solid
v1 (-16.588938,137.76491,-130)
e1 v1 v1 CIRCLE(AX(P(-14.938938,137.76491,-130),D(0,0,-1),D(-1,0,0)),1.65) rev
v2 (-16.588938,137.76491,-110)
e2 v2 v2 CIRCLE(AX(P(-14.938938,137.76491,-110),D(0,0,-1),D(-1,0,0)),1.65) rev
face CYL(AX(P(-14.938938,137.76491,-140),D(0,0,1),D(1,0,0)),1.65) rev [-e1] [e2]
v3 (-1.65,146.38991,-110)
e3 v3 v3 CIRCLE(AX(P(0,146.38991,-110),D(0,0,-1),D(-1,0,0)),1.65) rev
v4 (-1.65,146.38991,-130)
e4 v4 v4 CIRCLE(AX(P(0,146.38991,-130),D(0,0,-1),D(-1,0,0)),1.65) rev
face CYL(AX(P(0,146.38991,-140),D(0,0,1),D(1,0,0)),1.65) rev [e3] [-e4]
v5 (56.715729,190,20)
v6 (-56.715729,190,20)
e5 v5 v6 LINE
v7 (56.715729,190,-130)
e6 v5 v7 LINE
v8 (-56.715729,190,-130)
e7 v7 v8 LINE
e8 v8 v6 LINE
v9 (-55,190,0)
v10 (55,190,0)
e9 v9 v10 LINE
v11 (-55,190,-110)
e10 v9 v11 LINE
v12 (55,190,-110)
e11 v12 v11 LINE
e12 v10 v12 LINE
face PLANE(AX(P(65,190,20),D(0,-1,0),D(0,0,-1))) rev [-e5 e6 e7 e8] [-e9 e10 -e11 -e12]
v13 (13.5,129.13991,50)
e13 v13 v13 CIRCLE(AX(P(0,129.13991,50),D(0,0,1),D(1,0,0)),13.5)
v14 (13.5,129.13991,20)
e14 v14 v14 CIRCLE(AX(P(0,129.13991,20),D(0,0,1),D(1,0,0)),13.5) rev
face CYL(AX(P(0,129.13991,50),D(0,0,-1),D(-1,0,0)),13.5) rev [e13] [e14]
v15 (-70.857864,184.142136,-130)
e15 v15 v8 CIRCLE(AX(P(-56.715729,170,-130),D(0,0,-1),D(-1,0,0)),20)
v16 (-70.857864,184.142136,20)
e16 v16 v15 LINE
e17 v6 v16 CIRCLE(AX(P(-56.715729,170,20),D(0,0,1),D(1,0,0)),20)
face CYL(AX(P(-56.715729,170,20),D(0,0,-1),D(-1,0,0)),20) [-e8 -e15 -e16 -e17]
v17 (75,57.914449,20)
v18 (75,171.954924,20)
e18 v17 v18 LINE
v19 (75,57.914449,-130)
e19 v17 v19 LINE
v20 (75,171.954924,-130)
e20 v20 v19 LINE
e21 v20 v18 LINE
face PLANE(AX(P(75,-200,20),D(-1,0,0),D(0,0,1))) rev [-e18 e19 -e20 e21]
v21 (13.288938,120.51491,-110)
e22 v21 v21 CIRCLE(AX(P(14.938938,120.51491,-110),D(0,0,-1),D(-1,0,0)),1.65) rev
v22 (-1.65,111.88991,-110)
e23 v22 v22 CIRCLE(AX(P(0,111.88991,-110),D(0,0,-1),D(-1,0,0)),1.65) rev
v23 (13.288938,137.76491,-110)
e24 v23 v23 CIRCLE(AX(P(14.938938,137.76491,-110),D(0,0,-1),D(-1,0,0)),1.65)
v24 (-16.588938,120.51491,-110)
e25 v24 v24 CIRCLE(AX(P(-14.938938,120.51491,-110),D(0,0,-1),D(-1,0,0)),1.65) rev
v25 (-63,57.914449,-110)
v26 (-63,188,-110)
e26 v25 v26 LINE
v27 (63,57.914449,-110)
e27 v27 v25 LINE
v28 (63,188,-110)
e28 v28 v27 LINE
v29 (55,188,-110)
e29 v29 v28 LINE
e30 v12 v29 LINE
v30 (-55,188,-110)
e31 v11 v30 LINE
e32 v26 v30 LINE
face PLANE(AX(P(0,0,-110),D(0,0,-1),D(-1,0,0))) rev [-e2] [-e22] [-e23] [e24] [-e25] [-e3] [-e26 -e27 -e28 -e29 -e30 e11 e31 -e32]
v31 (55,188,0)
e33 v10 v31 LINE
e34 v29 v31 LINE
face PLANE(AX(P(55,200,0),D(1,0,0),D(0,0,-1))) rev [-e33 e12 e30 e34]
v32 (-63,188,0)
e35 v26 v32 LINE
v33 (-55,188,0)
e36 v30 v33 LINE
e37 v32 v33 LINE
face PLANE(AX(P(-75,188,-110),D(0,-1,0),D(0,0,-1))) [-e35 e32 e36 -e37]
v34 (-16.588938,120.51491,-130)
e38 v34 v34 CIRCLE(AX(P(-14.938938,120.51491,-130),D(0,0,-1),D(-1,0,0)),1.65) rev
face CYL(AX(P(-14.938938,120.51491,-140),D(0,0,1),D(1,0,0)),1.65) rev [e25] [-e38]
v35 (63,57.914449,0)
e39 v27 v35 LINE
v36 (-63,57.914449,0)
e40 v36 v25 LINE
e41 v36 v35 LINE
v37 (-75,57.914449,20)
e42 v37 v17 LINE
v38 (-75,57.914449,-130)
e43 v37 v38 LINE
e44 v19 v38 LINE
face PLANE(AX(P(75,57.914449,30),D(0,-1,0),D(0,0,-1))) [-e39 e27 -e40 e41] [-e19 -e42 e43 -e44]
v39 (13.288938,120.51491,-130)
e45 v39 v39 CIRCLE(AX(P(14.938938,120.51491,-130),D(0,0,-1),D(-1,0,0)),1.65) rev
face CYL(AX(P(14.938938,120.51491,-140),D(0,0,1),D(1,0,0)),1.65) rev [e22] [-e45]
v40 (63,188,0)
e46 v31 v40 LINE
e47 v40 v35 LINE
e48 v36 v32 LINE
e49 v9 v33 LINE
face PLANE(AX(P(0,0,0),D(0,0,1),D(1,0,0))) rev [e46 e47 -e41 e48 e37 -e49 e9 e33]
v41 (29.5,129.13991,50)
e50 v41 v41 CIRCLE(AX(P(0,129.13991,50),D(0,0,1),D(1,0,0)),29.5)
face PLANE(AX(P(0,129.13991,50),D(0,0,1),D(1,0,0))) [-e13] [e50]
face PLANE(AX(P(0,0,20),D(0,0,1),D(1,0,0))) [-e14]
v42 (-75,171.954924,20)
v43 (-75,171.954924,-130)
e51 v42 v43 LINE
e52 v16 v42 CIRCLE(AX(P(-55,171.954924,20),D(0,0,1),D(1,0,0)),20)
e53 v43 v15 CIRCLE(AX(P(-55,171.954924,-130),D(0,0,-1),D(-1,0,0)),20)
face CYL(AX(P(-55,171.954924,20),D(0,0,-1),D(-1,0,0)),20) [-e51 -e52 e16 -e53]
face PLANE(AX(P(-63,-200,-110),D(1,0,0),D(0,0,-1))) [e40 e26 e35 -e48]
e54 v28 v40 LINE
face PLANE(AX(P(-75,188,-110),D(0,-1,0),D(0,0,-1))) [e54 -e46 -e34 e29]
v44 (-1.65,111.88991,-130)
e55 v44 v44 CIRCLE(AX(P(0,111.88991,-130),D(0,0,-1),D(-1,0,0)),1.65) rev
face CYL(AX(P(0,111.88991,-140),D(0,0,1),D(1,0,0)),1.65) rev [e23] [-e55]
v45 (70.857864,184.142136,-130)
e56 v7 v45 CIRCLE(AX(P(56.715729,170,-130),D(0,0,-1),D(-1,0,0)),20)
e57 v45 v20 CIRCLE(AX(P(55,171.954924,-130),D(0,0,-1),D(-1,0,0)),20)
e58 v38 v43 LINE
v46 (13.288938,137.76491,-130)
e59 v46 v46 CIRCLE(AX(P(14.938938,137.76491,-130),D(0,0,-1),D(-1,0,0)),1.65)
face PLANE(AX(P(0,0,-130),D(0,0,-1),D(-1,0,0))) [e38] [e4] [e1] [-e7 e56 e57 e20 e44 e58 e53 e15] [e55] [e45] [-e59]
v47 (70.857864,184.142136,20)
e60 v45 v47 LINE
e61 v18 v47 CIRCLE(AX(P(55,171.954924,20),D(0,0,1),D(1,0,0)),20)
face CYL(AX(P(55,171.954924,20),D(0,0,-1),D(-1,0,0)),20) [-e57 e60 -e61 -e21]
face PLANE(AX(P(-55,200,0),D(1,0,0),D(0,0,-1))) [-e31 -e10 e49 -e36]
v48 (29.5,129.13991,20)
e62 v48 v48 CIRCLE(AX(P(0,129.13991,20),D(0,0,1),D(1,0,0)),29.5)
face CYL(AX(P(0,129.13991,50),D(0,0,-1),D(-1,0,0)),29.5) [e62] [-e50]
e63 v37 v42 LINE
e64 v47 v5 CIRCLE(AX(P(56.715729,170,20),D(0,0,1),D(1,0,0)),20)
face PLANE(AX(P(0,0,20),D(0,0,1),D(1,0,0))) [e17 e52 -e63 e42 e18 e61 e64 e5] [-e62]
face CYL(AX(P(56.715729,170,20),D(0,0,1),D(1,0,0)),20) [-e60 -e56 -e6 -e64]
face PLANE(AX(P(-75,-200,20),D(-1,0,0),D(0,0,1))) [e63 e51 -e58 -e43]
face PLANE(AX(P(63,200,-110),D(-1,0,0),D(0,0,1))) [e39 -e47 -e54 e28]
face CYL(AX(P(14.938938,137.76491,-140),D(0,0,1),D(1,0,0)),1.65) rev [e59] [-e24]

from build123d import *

# Parameters (mm, degrees)
EXTRUDE_1_OUTLINE_W             = 150
EXTRUDE_1_OUTLINE_H             = 400
EXTRUDE_1_OUTLINE_R             = 48.25
EXTRUDE_1_DEPTH                 = 20
SKETCH_2_W                      = 150
SKETCH_2_H                      = 400
SKETCH_2_W_2                    = 126
SKETCH_2_H_2                    = 376
EXTRUDE_1_2_DEPTH               = 110
EXTRUDE_START                   = 20
SKETCH_3_W                      = 150
SKETCH_3_H                      = 400
SKETCH_3_R                      = 48.25
EXTRUDE_3_DEPTH                 = 20
SKETCH_4_W                      = 110
SKETCH_4_H                      = 55
CUT_EXTRUDE_1_DEPTH             = 428.229446551
CHAMFER_2_SIZE                  = 20
CHAMFER_3_SIZE                  = 20
CUT_EXTRUDE_START               = 190
CUT_EXTRUDE_2_OUTLINE_W         = 132
CUT_EXTRUDE_2_OUTLINE_H         = 152
CUT_EXTRUDE_2_DEPTH             = 10
FILLET_1_R                      = 20
FILLET_2_R                      = 20
FILLET_3_R                      = 20
FILLET_4_R                      = 20
EXTRUDE_START_2                 = -20
SKETCH_6_R                      = 48.25
SKETCH_6_R_2                    = 29.5
EXTRUDE_4_DEPTH                 = 20
SKETCH_7_R                      = 48.25
SKETCH_7_R_2                    = 29.5
EXTRUDE_5_DEPTH                 = 20
SKETCH_8_R                      = 29.5
EXTRUDE_7_DEPTH                 = 20
SKETCH_9_R                      = 29.5
EXTRUDE_8_DEPTH                 = 20
SKETCH_10_R                     = 1.65
EXTRUDE_9_DEPTH                 = 10
EXTRUDE_START_3                 = 10
SKETCH_11_R                     = 1.65
EXTRUDE_10_DEPTH                = 10
SKETCH_12_W                     = 110
SKETCH_12_H                     = 147.914448675
CUT_EXTRUDE_3_DEPTH             = 287.530975638
CHAMFER_4_SIZE                  = 10
CHAMFER_5_SIZE                  = 10
SKETCH_13_W                     = 150
SKETCH_13_H                     = 80
CUT_EXTRUDE_4_DEPTH             = 267.880122902
SKETCH_15_R                     = 29.5
SKETCH_15_R_2                   = 13.5
EXTRUDE_11_DEPTH                = 30
CUT_EXTRUDE_5_REACH             = 274.259
SKETCH_16_R                     = 1.65
CUT_EXTRUDE_5_DIRECTION_2_DEPTH = 273.259067801


with BuildPart() as part:
    # Extrude 1: read off the stored shape, not the designer's step
    # Extrude 1 outline → Extrude 1 (new body)
    with BuildSketch(Plane.XY):
        Rectangle(EXTRUDE_1_OUTLINE_W, EXTRUDE_1_OUTLINE_H)
        with Locations((2.655190842, -130.335551325)):
            Circle(EXTRUDE_1_OUTLINE_R, mode=Mode.SUBTRACT)
        with Locations((0, 129.13990983)):
            Circle(EXTRUDE_1_OUTLINE_R, mode=Mode.SUBTRACT)
    extrude(amount=EXTRUDE_1_DEPTH)

    # 草图2 → Extrude 1 2 (add)
    with BuildSketch(Plane(origin=(0, 0, 0), x_dir=(-1, 0, 0), z_dir=(0, 0, -1))):
        Rectangle(SKETCH_2_W, SKETCH_2_H)
        Rectangle(SKETCH_2_W_2, SKETCH_2_H_2, mode=Mode.SUBTRACT)
    extrude(amount=EXTRUDE_1_2_DEPTH)

    # 草图3 → 凸台-拉伸3 (add)
    with BuildSketch(Plane(origin=(0, 0, -110), x_dir=(-1, 0, 0), z_dir=(0, 0, -1)).offset(EXTRUDE_START)):
        Rectangle(SKETCH_3_W, SKETCH_3_H)
        with Locations(Location((-2.655190842, -130.335551325, 0), (0, 0, 180))):
            Circle(SKETCH_3_R, mode=Mode.SUBTRACT)
        with Locations(Location((0, 129.13990983, 0), (0, 0, 180))):
            Circle(SKETCH_3_R, mode=Mode.SUBTRACT)
    extrude(amount=-EXTRUDE_3_DEPTH)

    # 草图4 → 切除-拉伸1 (cut, through all)
    with BuildSketch(Plane.XZ.offset(200)):
        with Locations((0, -27.5)):
            Rectangle(SKETCH_4_W, SKETCH_4_H)
        with Locations((0, -82.5)):
            Rectangle(SKETCH_4_W, SKETCH_4_H)
    extrude(amount=-CUT_EXTRUDE_1_DEPTH, mode=Mode.SUBTRACT)

    # 倒角2
    chamfer_2_edges = [part.edges().sort_by_distance(p)[0] for p in [
        (-75, 200, -55),
    ]]
    chamfer(chamfer_2_edges, length=CHAMFER_2_SIZE - 0.0001)  # a hair under: the kernel refuses the full size

    # 倒角3
    chamfer_3_edges = [part.edges().sort_by_distance(p)[0] for p in [
        (75, 200, -55),
    ]]
    chamfer(chamfer_3_edges, length=CHAMFER_3_SIZE - 0.0001)  # a hair under: the kernel refuses the full size

    # 切除-拉伸2: read off the stored shape, not the designer's step
    # 切除-拉伸2 outline → 切除-拉伸2 (cut)
    with BuildSketch(Plane(origin=(0, 0, 0), x_dir=(1, 0, 0), z_dir=(0, 1, 0)).offset(CUT_EXTRUDE_START)):
        with Locations((0, 55)):
            Rectangle(CUT_EXTRUDE_2_OUTLINE_W, CUT_EXTRUDE_2_OUTLINE_H)
    extrude(amount=CUT_EXTRUDE_2_DEPTH, mode=Mode.SUBTRACT)

    # 圆角1
    fillet_1_edges = [part.edges().sort_by_distance(p)[0] for p in [
        (-65.0001, 190, -55),
    ]]
    fillet(fillet_1_edges, radius=FILLET_1_R)

    # 圆角2
    fillet_2_edges = [part.edges().sort_by_distance(p)[0] for p in [
        (65.0001, 190, -55),
    ]]
    fillet(fillet_2_edges, radius=FILLET_2_R)

    # 圆角3
    # the kernel refuses this fillet: 20 mm, written as the material it takes off along each edge
    with BuildSketch(Plane(origin=(-75, 180.0001, 40.112615753), x_dir=(0.7071067811865488, 0.7071067811865464, 0), z_dir=(0, 0, -1))) as fillet_3_piece_1:
        with BuildLine():
            CenterArc((8.453428829, 19.830842418), FILLET_3_R, 225, 37.542814558)
            Line((-5.688706794, 5.688706794), (-5.971549507, 5.405864082))
            Line((-5.971549507, 5.405864082), (-0.282842712, -0.282842712))
            Line((-0.282842712, -0.282842712), (0, -0.4))
            ThreePointArc((0, -0.4), (2.928861477, -0.4), (5.805808837, -0.396616848))
            Line((5.805808837, -0.396616848), (5.857722955, 0))
        make_face()
    extrude(amount=190.225231505, mode=Mode.SUBTRACT)

    # 圆角4
    # the kernel refuses this fillet: 20 mm, written as the material it takes off along each edge
    with BuildSketch(Plane(origin=(75, 180.0001, -150.112615753), x_dir=(-0.7071067811865438, 0.7071067811865511, 0), z_dir=(0, 0, 1))) as fillet_4_piece_1:
        with BuildLine():
            CenterArc((8.453428829, 19.830842418), FILLET_4_R, 225, 37.542814558)
            Line((-5.688706794, 5.688706794), (-5.971549507, 5.405864082))
            Line((-5.971549507, 5.405864082), (-0.282842712, -0.282842712))
            Line((-0.282842712, -0.282842712), (0, -0.4))
            ThreePointArc((0, -0.4), (2.928861477, -0.4), (5.805808837, -0.396616848))
            Line((5.805808837, -0.396616848), (5.857722955, 0))
        make_face()
    extrude(amount=190.225231505, mode=Mode.SUBTRACT)

    # 草图6 → 凸台-拉伸4 (add)
    with BuildSketch(Plane.XY.offset(20).offset(EXTRUDE_START_2)):
        with Locations(Location((0, 129.13990983, 0), (0, 0, 180))):
            Circle(SKETCH_6_R)
        with Locations((0, 129.13990983)):
            Circle(SKETCH_6_R_2, mode=Mode.SUBTRACT)
    extrude(amount=EXTRUDE_4_DEPTH)

    # 草图7 → 凸台-拉伸5 (add)
    with BuildSketch(Plane(origin=(0, 0, -130), x_dir=(-1, 0, 0), z_dir=(0, 0, -1))):
        with Locations((0, 129.13990983)):
            Circle(SKETCH_7_R)
        with Locations(Location((0, 129.13990983, 0), (0, 0, 180))):
            Circle(SKETCH_7_R_2, mode=Mode.SUBTRACT)
    extrude(amount=-EXTRUDE_5_DEPTH)

    # 草图8 → 凸台-拉伸7 (add)
    with BuildSketch(Plane.XY.offset(20).offset(EXTRUDE_START_2)):
        with Locations(Location((0, 129.13990983, 0), (0, 0, 180))):
            Circle(SKETCH_8_R)
    extrude(amount=EXTRUDE_7_DEPTH)

    # 草图9 → 凸台-拉伸8 (add)
    with BuildSketch(Plane(origin=(0, 0, -130), x_dir=(-1, 0, 0), z_dir=(0, 0, -1))):
        with Locations((0, 129.13990983)):
            Circle(SKETCH_9_R)
    extrude(amount=-EXTRUDE_8_DEPTH)

    # 草图10 → 凸台-拉伸9 (add)
    with BuildSketch(Plane(origin=(0, 0, -130), x_dir=(-1, 0, 0), z_dir=(0, 0, -1))):
        with Locations((0, 146.38990983)):
            Circle(SKETCH_10_R)
        with Locations((14.938938215, 137.76490983)):
            Circle(SKETCH_10_R)
        with Locations((14.938938215, 120.51490983)):
            Circle(SKETCH_10_R)
        with Locations((0, 111.88990983)):
            Circle(SKETCH_10_R)
        with Locations((-14.938938215, 120.51490983)):
            Circle(SKETCH_10_R)
        with Locations((-14.938938215, 137.76490983)):
            Circle(SKETCH_10_R)
    extrude(amount=EXTRUDE_9_DEPTH)

    # 草图11 → 凸台-拉伸10 (add)
    with BuildSketch(Plane.XY.offset(20).offset(EXTRUDE_START_3)):
        with Locations(Location((-14.938938215, 137.76490983, 0), (0, 0, 180))):
            Circle(SKETCH_11_R)
        with Locations(Location((-14.938938215, 120.51490983, 0), (0, 0, 180))):
            Circle(SKETCH_11_R)
        with Locations(Location((0, 111.88990983, 0), (0, 0, 180))):
            Circle(SKETCH_11_R)
        with Locations(Location((14.938938215, 120.51490983, 0), (0, 0, 180))):
            Circle(SKETCH_11_R)
        with Locations(Location((0, 146.38990983, 0), (0, 0, 180))):
            Circle(SKETCH_11_R)
        with Locations(Location((14.938938215, 137.76490983, 0), (0, 0, 180))):
            Circle(SKETCH_11_R)
    extrude(amount=-EXTRUDE_10_DEPTH)

    # 草图12 → 切除-拉伸3 (cut, through all)
    with BuildSketch(Plane.ZY.offset(75)):
        with Locations((-55, -126.042775663)):
            Rectangle(SKETCH_12_W, SKETCH_12_H)
    extrude(amount=-CUT_EXTRUDE_3_DEPTH, mode=Mode.SUBTRACT)

    # 倒角4
    chamfer_4_edges = [part.edges().sort_by_distance(p)[0] for p in [
        (-75, -200, -120),
    ]]
    chamfer(chamfer_4_edges, length=CHAMFER_4_SIZE)

    # 倒角5
    chamfer_5_edges = [part.edges().sort_by_distance(p)[0] for p in [
        (75, -200, -120),
        (-75, -200, 10),
        (75, -200, 10),
    ]]
    chamfer(chamfer_5_edges, length=CHAMFER_5_SIZE)

    # 草图13 → 切除-拉伸4 (cut, through all)
    with BuildSketch(Plane(origin=(0, 0, -130), x_dir=(-1, 0, 0), z_dir=(0, 0, -1))):
        with Locations((0, 17.914448675)):
            Rectangle(SKETCH_13_W, SKETCH_13_H)
    extrude(amount=-CUT_EXTRUDE_4_DEPTH, mode=Mode.SUBTRACT)


with BuildPart() as body_2:
    # of the pieces the cut leaves, the one that is kept (cut_extrude_4_keep)
    add(part.part.solids().sort_by_distance((63, 188, -110))[0])

    # 草图15 → 凸台-拉伸11 (add)
    with BuildSketch(Plane.XY.offset(20)):
        with Locations((0, 129.13990983)):
            Circle(SKETCH_15_R)
        with Locations((0, 129.13990983)):
            Circle(SKETCH_15_R_2, mode=Mode.SUBTRACT)
    extrude(amount=EXTRUDE_11_DEPTH)

    # 草图16 → 切除-拉伸5 (cut, up to next)
    with BuildSketch(Plane(origin=(0, 0, -130), x_dir=(-1, 0, 0), z_dir=(0, 0, -1)), mode=Mode.PRIVATE) as cut_extrude_5_sk1:
        with Locations((-14.938938215, 137.76490983)):
            Circle(SKETCH_16_R)
    cut_extrude_5_tool1 = extrude(cut_extrude_5_sk1.sketch, amount=-CUT_EXTRUDE_5_REACH, mode=Mode.PRIVATE) & body_2.part
    # 草图16 → 切除-拉伸5 (cut, up to next)
    with BuildSketch(Plane(origin=(0, 0, -130), x_dir=(-1, 0, 0), z_dir=(0, 0, -1)), mode=Mode.PRIVATE) as cut_extrude_5_sk2:
        with Locations((0, 146.38990983)):
            Circle(SKETCH_16_R)
    cut_extrude_5_tool2 = extrude(cut_extrude_5_sk2.sketch, amount=-CUT_EXTRUDE_5_REACH, mode=Mode.PRIVATE) & body_2.part
    # 草图16 → 切除-拉伸5 (cut, up to next)
    with BuildSketch(Plane(origin=(0, 0, -130), x_dir=(-1, 0, 0), z_dir=(0, 0, -1)), mode=Mode.PRIVATE) as cut_extrude_5_sk3:
        with Locations((14.938938215, 137.76490983)):
            Circle(SKETCH_16_R)
    cut_extrude_5_tool3 = extrude(cut_extrude_5_sk3.sketch, amount=-CUT_EXTRUDE_5_REACH, mode=Mode.PRIVATE) & body_2.part
    # 草图16 → 切除-拉伸5 (cut, up to next)
    with BuildSketch(Plane(origin=(0, 0, -130), x_dir=(-1, 0, 0), z_dir=(0, 0, -1)), mode=Mode.PRIVATE) as cut_extrude_5_sk4:
        with Locations((14.938938215, 120.51490983)):
            Circle(SKETCH_16_R)
    cut_extrude_5_tool4 = extrude(cut_extrude_5_sk4.sketch, amount=-CUT_EXTRUDE_5_REACH, mode=Mode.PRIVATE) & body_2.part
    # 草图16 → 切除-拉伸5 (cut, up to next)
    with BuildSketch(Plane(origin=(0, 0, -130), x_dir=(-1, 0, 0), z_dir=(0, 0, -1)), mode=Mode.PRIVATE) as cut_extrude_5_sk5:
        with Locations((0, 111.88990983)):
            Circle(SKETCH_16_R)
    cut_extrude_5_tool5 = extrude(cut_extrude_5_sk5.sketch, amount=-CUT_EXTRUDE_5_REACH, mode=Mode.PRIVATE) & body_2.part
    # 草图16 → 切除-拉伸5 (cut, up to next)
    with BuildSketch(Plane(origin=(0, 0, -130), x_dir=(-1, 0, 0), z_dir=(0, 0, -1)), mode=Mode.PRIVATE) as cut_extrude_5_sk6:
        with Locations((-14.938938215, 120.51490983)):
            Circle(SKETCH_16_R)
    cut_extrude_5_tool6 = extrude(cut_extrude_5_sk6.sketch, amount=-CUT_EXTRUDE_5_REACH, mode=Mode.PRIVATE) & body_2.part
    add(cut_extrude_5_tool1.solids().sort_by_distance((14.938938, 137.76491, -130))[0], mode=Mode.SUBTRACT)
    add(cut_extrude_5_tool2.solids().sort_by_distance((0, 146.38991, -130))[0], mode=Mode.SUBTRACT)
    add(cut_extrude_5_tool3.solids().sort_by_distance((-14.938938, 137.76491, -130))[0], mode=Mode.SUBTRACT)
    add(cut_extrude_5_tool4.solids().sort_by_distance((-14.938938, 120.51491, -130))[0], mode=Mode.SUBTRACT)
    add(cut_extrude_5_tool5.solids().sort_by_distance((0, 111.88991, -130))[0], mode=Mode.SUBTRACT)
    add(cut_extrude_5_tool6.solids().sort_by_distance((14.938938, 120.51491, -130))[0], mode=Mode.SUBTRACT)

    # 草图16 → 切除-拉伸5 direction 2 (cut)
    with BuildSketch(Plane(origin=(0, 0, -130), x_dir=(-1, 0, 0), z_dir=(0, 0, -1))):
        with Locations((-14.938938215, 137.76490983)):
            Circle(SKETCH_16_R)
        with Locations((0, 146.38990983)):
            Circle(SKETCH_16_R)
        with Locations((14.938938215, 137.76490983)):
            Circle(SKETCH_16_R)
        with Locations((14.938938215, 120.51490983)):
            Circle(SKETCH_16_R)
        with Locations((0, 111.88990983)):
            Circle(SKETCH_16_R)
        with Locations((-14.938938215, 120.51490983)):
            Circle(SKETCH_16_R)
    extrude(amount=CUT_EXTRUDE_5_DIRECTION_2_DEPTH, mode=Mode.SUBTRACT)


solid = body_2.part
